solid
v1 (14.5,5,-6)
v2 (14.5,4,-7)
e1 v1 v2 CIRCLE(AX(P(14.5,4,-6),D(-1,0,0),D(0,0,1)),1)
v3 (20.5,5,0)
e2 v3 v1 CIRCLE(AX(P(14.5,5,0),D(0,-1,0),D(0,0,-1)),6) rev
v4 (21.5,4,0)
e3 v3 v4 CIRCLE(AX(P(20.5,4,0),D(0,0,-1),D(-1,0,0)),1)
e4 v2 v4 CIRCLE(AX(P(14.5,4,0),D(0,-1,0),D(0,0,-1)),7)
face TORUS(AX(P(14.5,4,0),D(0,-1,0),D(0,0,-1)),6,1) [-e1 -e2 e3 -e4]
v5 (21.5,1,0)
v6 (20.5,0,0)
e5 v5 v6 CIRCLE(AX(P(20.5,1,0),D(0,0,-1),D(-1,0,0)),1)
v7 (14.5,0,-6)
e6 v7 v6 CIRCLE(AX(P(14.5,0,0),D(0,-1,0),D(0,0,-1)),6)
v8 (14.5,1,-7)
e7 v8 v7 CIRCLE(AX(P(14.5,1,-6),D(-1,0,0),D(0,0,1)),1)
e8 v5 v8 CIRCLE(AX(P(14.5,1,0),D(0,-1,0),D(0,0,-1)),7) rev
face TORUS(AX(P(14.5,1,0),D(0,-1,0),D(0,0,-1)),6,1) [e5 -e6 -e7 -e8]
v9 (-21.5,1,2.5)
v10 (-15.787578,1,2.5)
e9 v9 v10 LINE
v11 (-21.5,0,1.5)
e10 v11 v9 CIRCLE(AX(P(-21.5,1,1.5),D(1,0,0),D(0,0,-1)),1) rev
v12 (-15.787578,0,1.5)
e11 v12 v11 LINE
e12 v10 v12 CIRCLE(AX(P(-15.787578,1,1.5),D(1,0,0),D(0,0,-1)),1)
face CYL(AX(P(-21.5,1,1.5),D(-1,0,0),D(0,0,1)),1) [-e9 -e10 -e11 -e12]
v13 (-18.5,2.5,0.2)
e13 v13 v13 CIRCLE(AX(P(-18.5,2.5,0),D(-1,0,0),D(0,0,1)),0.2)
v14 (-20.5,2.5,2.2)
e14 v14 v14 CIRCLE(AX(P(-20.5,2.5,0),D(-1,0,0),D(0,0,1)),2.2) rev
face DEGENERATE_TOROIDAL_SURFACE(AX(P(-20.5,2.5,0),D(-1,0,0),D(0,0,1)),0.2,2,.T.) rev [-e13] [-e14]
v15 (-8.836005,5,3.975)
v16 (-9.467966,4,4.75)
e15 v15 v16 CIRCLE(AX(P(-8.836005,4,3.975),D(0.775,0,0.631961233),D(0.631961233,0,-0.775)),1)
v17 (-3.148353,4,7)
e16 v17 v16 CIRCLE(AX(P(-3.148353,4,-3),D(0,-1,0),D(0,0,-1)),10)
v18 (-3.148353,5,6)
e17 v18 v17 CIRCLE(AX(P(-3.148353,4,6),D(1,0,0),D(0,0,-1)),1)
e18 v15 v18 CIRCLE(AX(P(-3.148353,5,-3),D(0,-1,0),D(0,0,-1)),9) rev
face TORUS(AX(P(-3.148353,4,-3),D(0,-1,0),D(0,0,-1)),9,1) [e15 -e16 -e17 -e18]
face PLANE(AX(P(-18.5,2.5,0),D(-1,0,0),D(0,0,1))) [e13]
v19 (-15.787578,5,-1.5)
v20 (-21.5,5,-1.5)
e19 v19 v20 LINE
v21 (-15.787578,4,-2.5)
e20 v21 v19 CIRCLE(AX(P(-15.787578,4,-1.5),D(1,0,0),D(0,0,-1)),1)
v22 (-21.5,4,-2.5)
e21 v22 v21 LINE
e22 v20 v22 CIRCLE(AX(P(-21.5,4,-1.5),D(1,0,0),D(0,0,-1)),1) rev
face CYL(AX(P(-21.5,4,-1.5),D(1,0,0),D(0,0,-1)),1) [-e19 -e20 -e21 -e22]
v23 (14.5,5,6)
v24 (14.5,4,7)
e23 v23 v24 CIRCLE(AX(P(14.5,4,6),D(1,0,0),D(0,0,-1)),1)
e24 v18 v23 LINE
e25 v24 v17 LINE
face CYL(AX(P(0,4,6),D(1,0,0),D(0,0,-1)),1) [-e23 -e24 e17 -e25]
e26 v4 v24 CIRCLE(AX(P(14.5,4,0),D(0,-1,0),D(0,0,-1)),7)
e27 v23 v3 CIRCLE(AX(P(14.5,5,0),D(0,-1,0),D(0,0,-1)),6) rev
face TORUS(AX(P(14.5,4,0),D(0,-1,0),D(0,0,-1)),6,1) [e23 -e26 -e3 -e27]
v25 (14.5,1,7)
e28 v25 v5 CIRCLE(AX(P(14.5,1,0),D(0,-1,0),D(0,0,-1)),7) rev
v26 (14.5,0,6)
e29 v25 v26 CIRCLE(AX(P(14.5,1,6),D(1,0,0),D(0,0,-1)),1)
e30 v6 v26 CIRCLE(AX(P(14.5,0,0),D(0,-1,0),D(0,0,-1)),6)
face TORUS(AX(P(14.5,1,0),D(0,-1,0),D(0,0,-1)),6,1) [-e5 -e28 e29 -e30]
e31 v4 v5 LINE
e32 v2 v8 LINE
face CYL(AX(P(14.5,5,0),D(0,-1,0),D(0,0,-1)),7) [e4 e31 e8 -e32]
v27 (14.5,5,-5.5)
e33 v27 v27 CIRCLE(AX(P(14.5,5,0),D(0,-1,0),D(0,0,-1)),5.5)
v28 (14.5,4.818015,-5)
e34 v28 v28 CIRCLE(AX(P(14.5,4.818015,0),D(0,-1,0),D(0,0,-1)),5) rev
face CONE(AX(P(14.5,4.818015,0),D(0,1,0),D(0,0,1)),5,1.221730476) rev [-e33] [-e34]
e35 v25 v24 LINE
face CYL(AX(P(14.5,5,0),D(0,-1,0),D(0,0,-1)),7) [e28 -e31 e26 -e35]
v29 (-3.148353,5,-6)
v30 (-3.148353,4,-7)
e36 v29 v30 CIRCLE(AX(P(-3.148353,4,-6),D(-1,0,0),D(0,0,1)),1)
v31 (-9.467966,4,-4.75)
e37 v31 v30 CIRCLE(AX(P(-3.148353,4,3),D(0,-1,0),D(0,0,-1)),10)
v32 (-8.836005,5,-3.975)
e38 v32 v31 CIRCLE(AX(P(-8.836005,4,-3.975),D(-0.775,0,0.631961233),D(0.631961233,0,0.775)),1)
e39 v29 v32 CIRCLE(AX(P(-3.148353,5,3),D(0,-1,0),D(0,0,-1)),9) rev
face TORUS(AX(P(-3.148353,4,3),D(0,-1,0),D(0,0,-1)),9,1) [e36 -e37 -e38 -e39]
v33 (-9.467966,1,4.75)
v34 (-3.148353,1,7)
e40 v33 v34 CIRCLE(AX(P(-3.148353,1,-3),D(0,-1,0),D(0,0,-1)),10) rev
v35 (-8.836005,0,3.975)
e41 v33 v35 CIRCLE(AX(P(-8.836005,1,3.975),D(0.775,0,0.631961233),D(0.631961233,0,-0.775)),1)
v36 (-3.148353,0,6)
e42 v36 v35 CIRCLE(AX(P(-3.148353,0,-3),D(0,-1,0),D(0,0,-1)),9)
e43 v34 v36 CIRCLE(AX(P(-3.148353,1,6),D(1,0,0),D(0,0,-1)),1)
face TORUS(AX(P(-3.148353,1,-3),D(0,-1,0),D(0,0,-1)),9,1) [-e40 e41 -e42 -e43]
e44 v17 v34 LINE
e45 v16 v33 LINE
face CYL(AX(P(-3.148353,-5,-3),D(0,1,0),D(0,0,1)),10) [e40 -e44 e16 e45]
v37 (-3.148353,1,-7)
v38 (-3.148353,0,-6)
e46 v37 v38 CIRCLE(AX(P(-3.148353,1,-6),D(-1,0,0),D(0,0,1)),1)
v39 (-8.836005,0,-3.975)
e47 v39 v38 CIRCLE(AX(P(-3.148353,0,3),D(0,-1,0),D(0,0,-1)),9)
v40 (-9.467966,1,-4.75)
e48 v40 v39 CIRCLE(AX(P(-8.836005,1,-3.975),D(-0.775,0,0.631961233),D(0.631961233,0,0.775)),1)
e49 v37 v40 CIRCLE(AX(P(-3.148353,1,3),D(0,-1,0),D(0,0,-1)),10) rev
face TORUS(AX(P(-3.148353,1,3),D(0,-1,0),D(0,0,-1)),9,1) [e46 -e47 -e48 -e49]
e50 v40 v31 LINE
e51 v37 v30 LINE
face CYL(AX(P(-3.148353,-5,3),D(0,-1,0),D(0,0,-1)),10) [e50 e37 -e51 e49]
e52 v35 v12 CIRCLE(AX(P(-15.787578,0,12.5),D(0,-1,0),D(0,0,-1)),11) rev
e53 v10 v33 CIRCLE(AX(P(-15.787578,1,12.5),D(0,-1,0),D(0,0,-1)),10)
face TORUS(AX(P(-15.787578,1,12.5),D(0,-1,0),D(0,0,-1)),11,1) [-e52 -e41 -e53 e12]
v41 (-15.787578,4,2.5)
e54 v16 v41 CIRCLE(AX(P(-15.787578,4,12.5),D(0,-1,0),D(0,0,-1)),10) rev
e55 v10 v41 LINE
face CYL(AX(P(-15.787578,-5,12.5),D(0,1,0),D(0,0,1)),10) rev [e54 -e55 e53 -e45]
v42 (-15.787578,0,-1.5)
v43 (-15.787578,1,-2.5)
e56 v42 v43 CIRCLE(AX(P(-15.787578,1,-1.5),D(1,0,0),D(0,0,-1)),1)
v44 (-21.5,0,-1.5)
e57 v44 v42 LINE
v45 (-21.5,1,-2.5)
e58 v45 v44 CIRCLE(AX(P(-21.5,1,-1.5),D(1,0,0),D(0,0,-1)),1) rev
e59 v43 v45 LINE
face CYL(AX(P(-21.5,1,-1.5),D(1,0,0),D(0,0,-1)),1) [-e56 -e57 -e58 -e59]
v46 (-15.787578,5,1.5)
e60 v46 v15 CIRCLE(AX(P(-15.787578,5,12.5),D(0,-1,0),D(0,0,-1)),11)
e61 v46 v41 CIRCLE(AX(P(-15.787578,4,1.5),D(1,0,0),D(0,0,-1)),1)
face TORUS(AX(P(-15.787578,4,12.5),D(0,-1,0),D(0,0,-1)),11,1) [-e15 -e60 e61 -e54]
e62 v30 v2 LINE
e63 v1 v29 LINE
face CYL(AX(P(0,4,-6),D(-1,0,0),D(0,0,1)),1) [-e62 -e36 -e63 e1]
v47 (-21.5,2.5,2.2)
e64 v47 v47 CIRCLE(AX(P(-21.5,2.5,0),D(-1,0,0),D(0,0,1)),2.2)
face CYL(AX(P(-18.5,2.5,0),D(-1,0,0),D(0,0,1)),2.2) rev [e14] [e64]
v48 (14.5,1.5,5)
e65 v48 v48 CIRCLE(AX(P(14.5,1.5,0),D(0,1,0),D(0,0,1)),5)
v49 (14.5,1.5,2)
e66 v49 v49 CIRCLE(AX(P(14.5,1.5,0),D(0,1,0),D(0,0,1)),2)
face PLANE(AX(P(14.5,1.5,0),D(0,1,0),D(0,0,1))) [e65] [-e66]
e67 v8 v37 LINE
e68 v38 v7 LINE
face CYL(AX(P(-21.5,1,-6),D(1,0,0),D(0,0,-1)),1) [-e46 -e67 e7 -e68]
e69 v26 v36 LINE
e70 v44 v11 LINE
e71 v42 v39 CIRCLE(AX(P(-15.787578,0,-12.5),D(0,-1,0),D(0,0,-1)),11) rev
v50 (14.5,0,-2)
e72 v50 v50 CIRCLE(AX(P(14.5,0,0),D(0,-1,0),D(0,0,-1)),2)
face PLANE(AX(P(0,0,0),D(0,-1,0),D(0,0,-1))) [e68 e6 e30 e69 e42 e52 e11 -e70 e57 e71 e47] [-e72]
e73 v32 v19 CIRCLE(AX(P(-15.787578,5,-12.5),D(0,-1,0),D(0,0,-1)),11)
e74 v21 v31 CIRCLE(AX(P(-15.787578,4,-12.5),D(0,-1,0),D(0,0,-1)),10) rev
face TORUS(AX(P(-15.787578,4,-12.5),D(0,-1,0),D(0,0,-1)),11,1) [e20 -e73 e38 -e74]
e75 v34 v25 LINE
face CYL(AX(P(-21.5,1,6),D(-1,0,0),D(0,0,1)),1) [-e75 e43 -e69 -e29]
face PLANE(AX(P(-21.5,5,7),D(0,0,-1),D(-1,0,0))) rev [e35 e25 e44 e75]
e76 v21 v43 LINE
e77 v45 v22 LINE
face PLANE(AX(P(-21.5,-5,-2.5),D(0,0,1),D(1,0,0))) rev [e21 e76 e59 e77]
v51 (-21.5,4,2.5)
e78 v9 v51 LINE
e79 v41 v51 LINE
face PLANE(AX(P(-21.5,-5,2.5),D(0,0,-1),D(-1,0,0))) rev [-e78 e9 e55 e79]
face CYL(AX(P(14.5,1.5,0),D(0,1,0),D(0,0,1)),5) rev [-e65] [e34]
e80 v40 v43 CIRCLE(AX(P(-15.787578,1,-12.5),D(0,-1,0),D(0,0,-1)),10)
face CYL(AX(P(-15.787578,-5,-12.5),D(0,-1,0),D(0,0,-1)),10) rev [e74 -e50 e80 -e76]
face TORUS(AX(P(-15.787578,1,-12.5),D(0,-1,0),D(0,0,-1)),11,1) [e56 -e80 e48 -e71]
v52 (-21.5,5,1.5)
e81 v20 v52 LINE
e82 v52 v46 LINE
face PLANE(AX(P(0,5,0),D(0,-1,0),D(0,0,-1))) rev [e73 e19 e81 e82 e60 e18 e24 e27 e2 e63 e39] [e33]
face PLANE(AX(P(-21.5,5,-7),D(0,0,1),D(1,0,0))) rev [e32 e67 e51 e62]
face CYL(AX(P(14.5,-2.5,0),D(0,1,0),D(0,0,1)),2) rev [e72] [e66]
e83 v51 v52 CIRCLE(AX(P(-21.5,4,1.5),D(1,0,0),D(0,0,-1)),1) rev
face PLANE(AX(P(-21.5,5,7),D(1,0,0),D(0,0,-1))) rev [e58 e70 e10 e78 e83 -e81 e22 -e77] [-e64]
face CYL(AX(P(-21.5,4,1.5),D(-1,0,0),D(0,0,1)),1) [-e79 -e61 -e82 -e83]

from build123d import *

# Parameters (mm, degrees)
SKETCH_2_W          = 43
SKETCH_2_H          = 14
EXTRUDE_1_DEPTH     = 5
SKETCH_6_R          = 5
CUT_EXTRUDE_4_DEPTH = 3.5
SKETCH_7_W          = 10
SKETCH_7_H          = 4.5
CUT_EXTRUDE_5_DEPTH = 10
FILLET_1_R          = 10
FILLET_2_R          = 10
FILLET_4_R          = 7
CHAMFER_1_SIZE      = 0.5
CHAMFER_1_SIZE2     = 0.181985117
FILLET_3_R          = 1
SKETCH_8_R          = 2.2
CUT_EXTRUDE_6_DEPTH = 3
FILLET_5_R          = 2
SKETCH_9_R          = 2
CUT_EXTRUDE_7_DEPTH = 4


# Some blends are built 0.0001 mm under size
with BuildPart() as part:
    # Эскиз2 → Бобышка-Вытянуть1 (new body)
    with BuildSketch(Plane(origin=(0, 0, 0), x_dir=(1, 0, 0), z_dir=(0, 1, 0))):
        Rectangle(SKETCH_2_W, SKETCH_2_H)
    extrude(amount=EXTRUDE_1_DEPTH)

    # Эскиз6 → Вырез-Вытянуть4 (cut)
    with BuildSketch(Plane(origin=(0, 5, 0), x_dir=(1, 0, 0), z_dir=(0, 1, 0))):
        with Locations(Location((14.5, 0, 0), (0, 0, 270))):
            Circle(SKETCH_6_R)
    extrude(amount=-CUT_EXTRUDE_4_DEPTH, mode=Mode.SUBTRACT)

    # Эскиз7 → Вырез-Вытянуть5 (cut)
    with BuildSketch(Plane(origin=(0, 5, 0), x_dir=(1, 0, 0), z_dir=(0, 1, 0))):
        with Locations((-16.5, -4.75)):
            Rectangle(SKETCH_7_W, SKETCH_7_H)
        with Locations((-16.5, 4.75)):
            Rectangle(SKETCH_7_W, SKETCH_7_H)
    extrude(amount=-CUT_EXTRUDE_5_DEPTH, mode=Mode.SUBTRACT)

    # Скругление1
    # the kernel refuses this fillet: 10 mm, written as the material it takes off along each edge
    with BuildSketch(Plane(origin=(-11.5, 25.879116361, 7), x_dir=(1, 0, 0), z_dir=(0, -1, 0))) as fillet_1_piece_1:
        with BuildLine():
            CenterArc((8.351646544, -10), FILLET_1_R, 90, 56.632987031)
            Line((0, -4.5), (-0.167032931, -4.39))
            ThreePointArc((-0.167032931, -4.39), (-0.2, -2.25), (-0.2, 0))
            Line((-0.2, 0), (0, 0.2))
            Line((0, 0.2), (8.351646544, 0.2))
            Line((8.351646544, 0.2), (8.351646544, 0))
        make_face()
    extrude(amount=46.758232721, mode=Mode.SUBTRACT)
    with BuildSketch(Plane(origin=(-11.5, 25.879116361, -7), x_dir=(1.535167055204576e-12, 0, 1.0), z_dir=(0, -1, 0))) as fillet_1_piece_2:
        with BuildLine():
            CenterArc((10, -8.351646544), FILLET_1_R, 123.367012969, 56.632987031)
            Line((0, -8.351646544), (-0.2, -8.351646544))
            Line((-0.2, -8.351646544), (-0.2, 0))
            Line((-0.2, 0), (0, 0.2))
            ThreePointArc((0, 0.2), (2.25, 0.2), (4.39, 0.167032931))
            Line((4.39, 0.167032931), (4.5, 0))
        make_face()
    extrude(amount=46.758232721, mode=Mode.SUBTRACT)

    # Скругление2
    fillet_2_edges = [part.edges().sort_by_distance(p)[0] for p in [
        (-11.5, 2.5, -2.5),
        (-11.5, 2.5, 2.5),
    ]]
    fillet(fillet_2_edges, radius=FILLET_2_R)

    # Скругление4
    fillet_4_edges = [part.edges().sort_by_distance(p)[0] for p in [
        (21.5, 2.5, -7),
        (21.5, 2.5, 7),
    ]]
    fillet(fillet_4_edges, radius=FILLET_4_R - 0.0001)  # a hair under: the kernel refuses the full size

    # Фаска1
    chamfer_1_edges = [part.edges().sort_by_distance(p)[0] for p in [
        (14.5, 5, -5),
    ]]
    chamfer_1_side = [part.faces().sort_by_distance(p)[0] for p in [
        (0.230514486, 5, 0),
    ]]
    chamfer(chamfer_1_edges, length=CHAMFER_1_SIZE, length2=CHAMFER_1_SIZE2, reference=chamfer_1_side[0])

    # Скругление3
    fillet_3_edges = [part.edges().sort_by_distance(p)[0] for p in [
        (-18.643789058, 0, 2.5),
        (-18.643789058, 5, -2.5),
        (5.675873272, 5, 7),
        (-6.502455422, 5, -6.420721841),
        (5.675873272, 0, 7),
        (-6.502455422, 0, 6.420721841),
        (-6.502455422, 0, -6.420721841),
        (-18.643789058, 0, -2.5),
        (-18.643789058, 5, 2.5),
        (-6.502455422, 5, 6.420721841),
        (-12.433476149, 5, -3.079278159),
        (-12.433476149, 0, -3.079278159),
        (-12.433476149, 5, 3.079278159),
        (-12.433476149, 0, 3.079278159),
        (5.675873272, 0, -7),
        (5.675873272, 5, -7),
        (19.449776758, 0, 4.949776758),
        (19.449776758, 0, -4.949776758),
        (19.449776758, 5, 4.949776758),
        (19.449776758, 5, -4.949776758),
    ]]
    fillet(fillet_3_edges, radius=FILLET_3_R)

    # Эскиз8 → Вырез-Вытянуть6 (cut)
    with BuildSketch(Plane.ZY.offset(21.5)):
        with Locations((0, 2.5)):
            Circle(SKETCH_8_R)
    extrude(amount=-CUT_EXTRUDE_6_DEPTH, mode=Mode.SUBTRACT)

    # Скругление5
    fillet_5_edges = [part.edges().sort_by_distance(p)[0] for p in [
        (-18.5, 2.5, -2.2),
    ]]
    fillet(fillet_5_edges, radius=FILLET_5_R)

    # Эскиз9 → Вырез-Вытянуть7 (cut)
    with BuildSketch(Plane(origin=(0, 1.5, 0), x_dir=(1, 0, 0), z_dir=(0, 1, 0))):
        with Locations(Location((14.5, 0, 0), (0, 0, 270))):
            Circle(SKETCH_9_R)
    extrude(amount=-CUT_EXTRUDE_7_DEPTH, mode=Mode.SUBTRACT)


solid = part.part
